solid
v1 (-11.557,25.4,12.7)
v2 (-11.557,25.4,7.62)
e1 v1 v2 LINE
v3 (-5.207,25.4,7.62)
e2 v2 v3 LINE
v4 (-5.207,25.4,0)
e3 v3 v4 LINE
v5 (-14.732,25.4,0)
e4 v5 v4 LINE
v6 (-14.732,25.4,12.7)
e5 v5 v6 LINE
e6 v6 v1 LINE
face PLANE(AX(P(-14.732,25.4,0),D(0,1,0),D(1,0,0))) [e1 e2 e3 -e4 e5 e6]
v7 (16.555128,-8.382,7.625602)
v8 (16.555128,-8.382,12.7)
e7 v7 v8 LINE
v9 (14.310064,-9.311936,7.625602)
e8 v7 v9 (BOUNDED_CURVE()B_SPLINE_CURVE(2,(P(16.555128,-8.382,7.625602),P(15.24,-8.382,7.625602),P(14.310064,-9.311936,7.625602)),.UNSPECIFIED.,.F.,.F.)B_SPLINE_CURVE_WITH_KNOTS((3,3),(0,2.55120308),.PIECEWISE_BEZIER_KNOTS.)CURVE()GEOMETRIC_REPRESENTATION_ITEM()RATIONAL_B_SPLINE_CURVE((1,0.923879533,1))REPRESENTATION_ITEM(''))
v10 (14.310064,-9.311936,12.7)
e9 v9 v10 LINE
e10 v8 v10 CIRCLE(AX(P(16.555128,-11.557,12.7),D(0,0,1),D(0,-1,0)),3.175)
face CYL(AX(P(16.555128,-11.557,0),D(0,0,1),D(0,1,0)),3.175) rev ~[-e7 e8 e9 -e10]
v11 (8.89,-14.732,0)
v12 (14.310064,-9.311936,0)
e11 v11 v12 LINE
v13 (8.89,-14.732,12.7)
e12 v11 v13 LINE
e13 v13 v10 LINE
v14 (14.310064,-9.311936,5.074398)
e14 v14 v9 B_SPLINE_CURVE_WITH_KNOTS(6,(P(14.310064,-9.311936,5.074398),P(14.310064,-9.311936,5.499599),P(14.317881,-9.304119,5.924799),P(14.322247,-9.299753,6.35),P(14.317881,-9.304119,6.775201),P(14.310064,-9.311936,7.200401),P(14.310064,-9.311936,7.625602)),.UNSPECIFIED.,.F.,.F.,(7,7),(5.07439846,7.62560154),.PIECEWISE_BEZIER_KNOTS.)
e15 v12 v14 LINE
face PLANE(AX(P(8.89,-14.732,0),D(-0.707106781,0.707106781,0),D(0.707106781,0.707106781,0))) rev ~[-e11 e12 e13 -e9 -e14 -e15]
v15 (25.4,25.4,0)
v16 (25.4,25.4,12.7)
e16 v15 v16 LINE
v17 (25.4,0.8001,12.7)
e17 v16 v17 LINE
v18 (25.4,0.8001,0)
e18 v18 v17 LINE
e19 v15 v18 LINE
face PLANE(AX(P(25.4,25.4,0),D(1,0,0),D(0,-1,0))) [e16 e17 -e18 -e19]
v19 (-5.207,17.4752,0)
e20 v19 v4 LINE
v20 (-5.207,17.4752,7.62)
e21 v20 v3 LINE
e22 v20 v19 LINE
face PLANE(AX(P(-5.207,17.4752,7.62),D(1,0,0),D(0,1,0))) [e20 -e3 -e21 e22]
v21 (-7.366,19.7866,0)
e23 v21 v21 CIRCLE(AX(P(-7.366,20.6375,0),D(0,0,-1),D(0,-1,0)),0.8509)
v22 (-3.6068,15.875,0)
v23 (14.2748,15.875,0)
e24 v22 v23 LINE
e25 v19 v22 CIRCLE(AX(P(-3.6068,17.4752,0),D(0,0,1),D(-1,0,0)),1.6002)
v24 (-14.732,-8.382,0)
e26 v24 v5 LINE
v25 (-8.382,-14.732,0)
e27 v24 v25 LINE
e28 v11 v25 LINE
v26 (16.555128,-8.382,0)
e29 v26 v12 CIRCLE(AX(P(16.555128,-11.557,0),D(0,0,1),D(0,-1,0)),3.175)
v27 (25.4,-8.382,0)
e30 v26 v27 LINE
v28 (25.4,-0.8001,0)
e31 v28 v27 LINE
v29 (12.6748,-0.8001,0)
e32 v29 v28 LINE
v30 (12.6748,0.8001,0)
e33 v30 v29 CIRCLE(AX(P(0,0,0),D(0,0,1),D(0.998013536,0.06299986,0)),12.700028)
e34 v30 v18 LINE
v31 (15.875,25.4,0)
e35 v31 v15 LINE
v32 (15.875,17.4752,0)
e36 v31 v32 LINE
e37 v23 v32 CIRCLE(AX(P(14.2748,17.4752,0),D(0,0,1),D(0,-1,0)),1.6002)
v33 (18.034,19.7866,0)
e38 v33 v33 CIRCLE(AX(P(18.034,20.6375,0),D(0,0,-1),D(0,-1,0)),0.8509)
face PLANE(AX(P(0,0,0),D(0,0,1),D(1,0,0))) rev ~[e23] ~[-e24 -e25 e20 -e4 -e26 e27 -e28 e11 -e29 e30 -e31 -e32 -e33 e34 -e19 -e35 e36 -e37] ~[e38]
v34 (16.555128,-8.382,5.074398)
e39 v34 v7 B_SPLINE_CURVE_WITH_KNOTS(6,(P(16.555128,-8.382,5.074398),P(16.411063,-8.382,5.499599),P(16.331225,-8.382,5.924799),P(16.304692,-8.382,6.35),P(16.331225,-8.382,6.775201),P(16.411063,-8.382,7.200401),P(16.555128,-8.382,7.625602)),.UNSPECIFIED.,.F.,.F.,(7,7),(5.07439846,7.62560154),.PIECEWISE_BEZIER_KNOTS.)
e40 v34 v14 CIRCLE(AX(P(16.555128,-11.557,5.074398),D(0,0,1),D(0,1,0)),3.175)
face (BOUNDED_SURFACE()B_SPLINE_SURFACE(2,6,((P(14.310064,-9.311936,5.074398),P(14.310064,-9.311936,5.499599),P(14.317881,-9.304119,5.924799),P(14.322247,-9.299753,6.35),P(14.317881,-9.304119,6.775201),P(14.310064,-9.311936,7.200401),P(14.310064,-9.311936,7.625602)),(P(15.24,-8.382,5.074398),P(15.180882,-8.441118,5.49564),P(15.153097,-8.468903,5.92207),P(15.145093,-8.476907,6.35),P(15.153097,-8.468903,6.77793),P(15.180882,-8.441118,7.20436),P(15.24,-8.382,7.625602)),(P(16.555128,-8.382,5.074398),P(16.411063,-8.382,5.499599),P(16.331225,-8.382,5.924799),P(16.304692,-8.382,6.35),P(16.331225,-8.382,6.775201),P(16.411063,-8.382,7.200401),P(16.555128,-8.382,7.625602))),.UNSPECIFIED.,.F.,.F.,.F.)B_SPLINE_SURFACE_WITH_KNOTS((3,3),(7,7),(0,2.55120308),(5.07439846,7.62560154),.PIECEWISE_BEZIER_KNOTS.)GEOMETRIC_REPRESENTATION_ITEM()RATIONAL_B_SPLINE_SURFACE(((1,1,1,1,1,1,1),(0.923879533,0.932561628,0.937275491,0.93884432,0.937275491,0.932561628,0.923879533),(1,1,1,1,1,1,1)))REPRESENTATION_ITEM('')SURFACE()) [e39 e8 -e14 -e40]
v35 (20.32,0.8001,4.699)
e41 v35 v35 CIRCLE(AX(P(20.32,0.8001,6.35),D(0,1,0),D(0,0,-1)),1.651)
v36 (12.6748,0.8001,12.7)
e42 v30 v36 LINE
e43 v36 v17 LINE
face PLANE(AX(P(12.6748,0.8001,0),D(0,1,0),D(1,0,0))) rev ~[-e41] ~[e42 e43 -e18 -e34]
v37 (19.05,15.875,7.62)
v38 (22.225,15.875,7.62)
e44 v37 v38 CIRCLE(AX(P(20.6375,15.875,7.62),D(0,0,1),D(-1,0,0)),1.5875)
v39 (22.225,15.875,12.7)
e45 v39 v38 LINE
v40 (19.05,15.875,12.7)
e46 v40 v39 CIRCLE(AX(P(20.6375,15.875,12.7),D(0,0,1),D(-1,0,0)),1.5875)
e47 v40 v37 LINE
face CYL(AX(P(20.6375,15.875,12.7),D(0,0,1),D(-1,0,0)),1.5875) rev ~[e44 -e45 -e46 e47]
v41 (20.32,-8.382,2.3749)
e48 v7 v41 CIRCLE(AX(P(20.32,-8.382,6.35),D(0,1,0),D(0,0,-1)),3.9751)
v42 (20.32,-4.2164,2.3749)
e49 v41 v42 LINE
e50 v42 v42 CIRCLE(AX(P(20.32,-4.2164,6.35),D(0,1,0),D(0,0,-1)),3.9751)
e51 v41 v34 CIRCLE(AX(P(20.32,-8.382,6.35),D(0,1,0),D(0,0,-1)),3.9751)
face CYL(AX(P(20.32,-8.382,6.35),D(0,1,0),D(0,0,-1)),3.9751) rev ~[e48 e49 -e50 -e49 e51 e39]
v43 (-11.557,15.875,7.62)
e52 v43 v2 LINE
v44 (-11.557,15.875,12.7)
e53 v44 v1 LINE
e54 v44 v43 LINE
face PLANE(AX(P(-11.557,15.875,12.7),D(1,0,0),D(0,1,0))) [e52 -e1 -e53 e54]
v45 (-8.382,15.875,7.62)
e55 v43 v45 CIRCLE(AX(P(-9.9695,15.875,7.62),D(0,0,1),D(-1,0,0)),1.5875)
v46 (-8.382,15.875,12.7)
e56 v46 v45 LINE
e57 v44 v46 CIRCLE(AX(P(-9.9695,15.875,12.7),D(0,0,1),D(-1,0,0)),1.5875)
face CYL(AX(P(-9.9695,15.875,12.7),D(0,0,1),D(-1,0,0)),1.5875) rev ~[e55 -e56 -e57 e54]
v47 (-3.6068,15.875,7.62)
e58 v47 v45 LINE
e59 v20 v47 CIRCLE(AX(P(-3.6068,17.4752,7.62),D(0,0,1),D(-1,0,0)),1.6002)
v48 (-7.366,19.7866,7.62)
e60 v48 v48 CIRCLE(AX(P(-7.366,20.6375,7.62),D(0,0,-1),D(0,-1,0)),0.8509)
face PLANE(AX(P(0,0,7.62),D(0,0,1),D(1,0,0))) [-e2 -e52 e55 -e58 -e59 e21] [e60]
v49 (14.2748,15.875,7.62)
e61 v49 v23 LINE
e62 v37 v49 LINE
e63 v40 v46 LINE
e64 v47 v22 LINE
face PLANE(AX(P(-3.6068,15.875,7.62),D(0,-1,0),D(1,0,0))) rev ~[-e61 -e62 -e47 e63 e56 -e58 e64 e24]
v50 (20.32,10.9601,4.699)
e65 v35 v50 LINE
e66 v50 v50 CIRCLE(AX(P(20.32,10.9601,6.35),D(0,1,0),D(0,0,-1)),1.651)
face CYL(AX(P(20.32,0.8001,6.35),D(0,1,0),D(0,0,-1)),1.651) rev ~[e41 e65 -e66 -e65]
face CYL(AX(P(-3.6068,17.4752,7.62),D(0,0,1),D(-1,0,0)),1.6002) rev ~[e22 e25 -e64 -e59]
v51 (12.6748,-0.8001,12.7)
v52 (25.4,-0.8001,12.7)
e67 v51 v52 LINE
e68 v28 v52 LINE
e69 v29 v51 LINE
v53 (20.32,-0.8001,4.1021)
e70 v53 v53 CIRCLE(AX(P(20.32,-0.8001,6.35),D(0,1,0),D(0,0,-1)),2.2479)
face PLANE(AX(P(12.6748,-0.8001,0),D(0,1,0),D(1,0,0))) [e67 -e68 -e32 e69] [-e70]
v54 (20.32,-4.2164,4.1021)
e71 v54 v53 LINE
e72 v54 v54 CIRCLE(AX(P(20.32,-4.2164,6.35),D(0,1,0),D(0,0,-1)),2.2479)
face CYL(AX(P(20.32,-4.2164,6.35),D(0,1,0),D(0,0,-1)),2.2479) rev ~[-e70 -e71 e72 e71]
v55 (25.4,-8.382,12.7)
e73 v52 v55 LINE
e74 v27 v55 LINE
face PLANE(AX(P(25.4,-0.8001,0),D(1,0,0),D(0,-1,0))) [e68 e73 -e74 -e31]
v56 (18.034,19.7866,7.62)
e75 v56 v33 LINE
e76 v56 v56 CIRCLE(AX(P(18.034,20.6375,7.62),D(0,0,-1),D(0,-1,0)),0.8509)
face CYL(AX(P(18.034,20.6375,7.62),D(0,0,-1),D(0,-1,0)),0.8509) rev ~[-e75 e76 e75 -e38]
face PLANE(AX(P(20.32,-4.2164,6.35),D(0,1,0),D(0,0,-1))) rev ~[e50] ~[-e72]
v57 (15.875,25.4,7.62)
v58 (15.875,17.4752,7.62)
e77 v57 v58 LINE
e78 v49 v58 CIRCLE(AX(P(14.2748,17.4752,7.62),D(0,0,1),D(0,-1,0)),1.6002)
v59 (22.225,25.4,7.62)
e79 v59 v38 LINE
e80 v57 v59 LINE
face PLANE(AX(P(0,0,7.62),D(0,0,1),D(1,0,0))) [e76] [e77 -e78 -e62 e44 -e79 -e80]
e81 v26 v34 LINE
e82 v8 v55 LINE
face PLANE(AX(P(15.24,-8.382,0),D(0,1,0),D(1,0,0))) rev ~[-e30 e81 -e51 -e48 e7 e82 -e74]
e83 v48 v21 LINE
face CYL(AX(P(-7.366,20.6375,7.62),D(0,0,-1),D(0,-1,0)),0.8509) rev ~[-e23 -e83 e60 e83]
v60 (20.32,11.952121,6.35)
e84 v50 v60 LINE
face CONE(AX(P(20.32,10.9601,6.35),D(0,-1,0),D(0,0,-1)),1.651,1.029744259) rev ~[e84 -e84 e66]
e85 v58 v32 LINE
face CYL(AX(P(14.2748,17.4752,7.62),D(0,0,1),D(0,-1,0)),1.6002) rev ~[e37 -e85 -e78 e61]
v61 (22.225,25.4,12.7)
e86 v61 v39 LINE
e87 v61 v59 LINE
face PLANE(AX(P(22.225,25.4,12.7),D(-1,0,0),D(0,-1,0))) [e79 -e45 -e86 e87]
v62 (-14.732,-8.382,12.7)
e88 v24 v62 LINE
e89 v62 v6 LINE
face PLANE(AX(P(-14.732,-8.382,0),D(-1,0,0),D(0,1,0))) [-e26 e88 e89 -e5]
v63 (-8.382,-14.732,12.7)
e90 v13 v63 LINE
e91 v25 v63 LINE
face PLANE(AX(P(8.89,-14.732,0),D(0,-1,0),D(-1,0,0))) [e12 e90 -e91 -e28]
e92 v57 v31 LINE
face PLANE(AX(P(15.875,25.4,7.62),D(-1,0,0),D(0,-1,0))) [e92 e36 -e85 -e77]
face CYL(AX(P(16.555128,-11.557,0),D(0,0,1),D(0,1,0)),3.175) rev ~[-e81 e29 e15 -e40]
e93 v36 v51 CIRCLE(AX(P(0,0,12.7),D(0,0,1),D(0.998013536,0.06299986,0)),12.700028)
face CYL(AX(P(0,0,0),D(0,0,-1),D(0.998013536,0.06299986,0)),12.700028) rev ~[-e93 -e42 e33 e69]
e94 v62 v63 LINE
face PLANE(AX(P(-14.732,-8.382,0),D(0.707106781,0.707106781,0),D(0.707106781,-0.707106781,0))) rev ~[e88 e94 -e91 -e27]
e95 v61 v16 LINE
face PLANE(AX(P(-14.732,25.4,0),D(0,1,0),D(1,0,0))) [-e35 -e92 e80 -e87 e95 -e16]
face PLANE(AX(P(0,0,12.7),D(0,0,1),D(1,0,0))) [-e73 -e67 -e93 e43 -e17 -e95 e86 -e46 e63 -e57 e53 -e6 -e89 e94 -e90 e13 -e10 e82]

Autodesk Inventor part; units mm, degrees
ref_plane "YZ Plane" through (0, 0, 0) normal (1, 0, 0) x (0, 1, 0)
ref_plane "XZ Plane" through (0, 0, 0) normal (0, 1, 0) x (-1, 0, 0)
ref_plane "XY Plane" through (0, 0, 0) normal (0, 0, 1) x (1, 0, 0)
sketch "Sketch1" plane through (0, 0, 0) normal (0, 0, 1) x (1, 0, 0)
  arc A0 (12.6748, 0.8001) -> (12.6748, -0.8001) centre (0, 0) ccw
  line L0 (-14.732, 25.4) -> (25.4, 25.4)
  line L1 (8.89, -14.732) -> (-8.382, -14.732)
  line L2 (-14.732, -8.382) -> (-14.732, 25.4)
  line L3 (-14.732, -8.382) -> (-8.382, -14.732)
  line L4 (8.89, -14.732) -> (15.24, -8.382)
  line L5 (15.24, -8.382) -> (25.4, -8.382)
  line L6 (-22.7584, 0) -> (33.4264, 0) construction
  line L7 (0, -22.7584) -> (0, 33.4264) construction
  line L8 (12.6748, 0.8001) -> (25.4, 0.8001)
  line L9 (12.6748, -0.8001) -> (25.4, -0.8001)
  line L10 (25.4, 25.4) -> (25.4, 0.8001)
  line L11 (25.4, -0.8001) -> (25.4, -8.382)
  dimension "d0" = 25.4
  dimension "d1" = 14.732
  dimension "d2" = 14.732
  dimension "d4" = 25.4
  dimension "d9" = 1.6002
  dimension "d11" = 45
  dimension "d12" = 25.4
  dimension "d14" = 8.89
  dimension "d15" = 15.24
  dimension "d49" = 45
extrude "Extrusion1" add sketch "Sketch1" along normal blind 12.7
sketch "Sketch2" plane through (0, 0, 12.7) normal (0, 0, 1) x (1, 0, 0)
  line L0 (-14.732, -8.382) -> (-14.732, 25.4) projected
  line L1 (-14.732, 25.4) -> (25.4, 25.4) projected
  line L2 (25.4, 25.4) -> (25.4, 0.8001) projected
  line L3 (-22.7584, 0) -> (33.4264, 0) construction
  line L4 (0, -22.7584) -> (0, 33.4264) construction
  line L5 (-11.557, 25.4) -> (22.225, 25.4)
  line L6 (22.225, 25.4) -> (22.225, 15.875)
  line L7 (19.05, 15.875) -> (-8.382, 15.875)
  line L8 (-11.557, 15.875) -> (-11.557, 25.4)
  arc A0 (-11.557, 15.875) -> (-8.382, 15.875) centre (-9.9695, 15.875) ccw
  arc A1 (19.05, 15.875) -> (22.225, 15.875) centre (20.6375, 15.875) ccw
  point P0 (0, 0)
  dimension "d16" = 3.175
  dimension "d17" = 3.175
  dimension "d18" = 9.525
  dimension "d19" = 3.175
extrude "Extrusion2" cut sketch "Sketch2" against normal blind 5.08
sketch "Sketch3" plane through (0, 0, 7.62) normal (0, 0, 1) x (1, 0, 0)
  line L0 (-11.557, 25.4) -> (22.225, 25.4) projected
  line L1 (-8.382, 15.875) -> (19.05, 15.875) projected
  line L2 (-5.207, 25.4) -> (15.875, 25.4)
  line L3 (15.875, 25.4) -> (15.875, 17.4752)
  line L4 (14.2748, 15.875) -> (-3.6068, 15.875)
  line L5 (-5.207, 17.4752) -> (-5.207, 25.4)
  arc A0 (-5.207, 17.4752) -> (-3.6068, 15.875) centre (-3.6068, 17.4752) ccw
  arc A1 (14.2748, 15.875) -> (15.875, 17.4752) centre (14.2748, 17.4752) ccw
  line L6 (5.334, 25.4) -> (5.334, 15.875) construction
  point P0 (0, 0)
  point P1 (15.875, 15.875)
  dimension "d22" = 1.6002
  dimension "d24" = 6.35
extrude "Extrusion3" cut sketch "Sketch3" against normal through all
sketch "Sketch4" plane through (0, 0, 7.62) normal (0, 0, 1) x (1, 0, 0)
  line L0 (22.225, 25.4) -> (22.225, 15.875) projected
  line L1 (-11.557, 25.4) -> (-11.557, 15.875) projected
  line L2 (-11.557, 20.6375) -> (22.225, 20.6375) construction
  line L3 (5.334, 29.021) -> (5.334, 12.254) construction
  point P0 (0, 0)
  point P1 (-7.366, 20.6375)
  point P2 (18.034, 20.6375)
  point P3 (23.8317, 40.0005)
  point P4 (5.334, 20.6375)
  dimension "d27" = 25.4
hole "Hole1" at (-7.366, 20.6375, 7.62) at (18.034, 20.6375, 7.62) at (23.8317, 40.0005, 7.62) direction (0, 0, -1) diameter 1.7018 end through all
sketch "Sketch5" plane through (15.24, -8.382, 0) normal (0, -1, 0) x (1, 0, 0)
  line L0 (10.16, 12.7) -> (0, 12.7) projected
  line L1 (0, 0) -> (0, 12.7) projected
  line L2 (10.16, 0) -> (0, 0) projected
  line L3 (10.16, 0) -> (10.16, 12.7) projected
  line L4 (5.08, 12.7) -> (5.08, 0) construction
  point P0 (-15.24, 0)
  point P1 (5.08, 6.35)
hole "Hole2" at (20.32, -8.382, 6.35) direction (0, 1, 0) diameter 4.4958 end up to surface counterbore diameter 7.9502 counterbore depth 4.1656 clearance for "Socket Head Cap Screw" size "#8" standard "Ansi Unified Screw Threads"
sketch "Sketch6" plane through (12.6748, 0.8001, 0) normal (0, -1, 0) x (1, 0, 0)
  circle A0 centre (7.6452, 6.35) radius 2.2479 projected
  point P0 (-12.6748, 0)
hole "Hole3" at (20.32, 0.8001, 6.35) direction (0, 1, 0) diameter 3.302 depth 10.16 tip angle 118 thread size "8-32 UNC" class "2B" standard "ANSI Unified Screw Threads"
fillet "Fillet1" radius 3.175 1 edges at (15.24, -8.382, 6.35)
equation "\"d1\" = d2"
equation "\"d14\" = d13"
equation "\"d17\" = d16"
equation "\"d13\" = 8.89"
properties part number "J002637" material "ALUMINUM, 6061-T651"
